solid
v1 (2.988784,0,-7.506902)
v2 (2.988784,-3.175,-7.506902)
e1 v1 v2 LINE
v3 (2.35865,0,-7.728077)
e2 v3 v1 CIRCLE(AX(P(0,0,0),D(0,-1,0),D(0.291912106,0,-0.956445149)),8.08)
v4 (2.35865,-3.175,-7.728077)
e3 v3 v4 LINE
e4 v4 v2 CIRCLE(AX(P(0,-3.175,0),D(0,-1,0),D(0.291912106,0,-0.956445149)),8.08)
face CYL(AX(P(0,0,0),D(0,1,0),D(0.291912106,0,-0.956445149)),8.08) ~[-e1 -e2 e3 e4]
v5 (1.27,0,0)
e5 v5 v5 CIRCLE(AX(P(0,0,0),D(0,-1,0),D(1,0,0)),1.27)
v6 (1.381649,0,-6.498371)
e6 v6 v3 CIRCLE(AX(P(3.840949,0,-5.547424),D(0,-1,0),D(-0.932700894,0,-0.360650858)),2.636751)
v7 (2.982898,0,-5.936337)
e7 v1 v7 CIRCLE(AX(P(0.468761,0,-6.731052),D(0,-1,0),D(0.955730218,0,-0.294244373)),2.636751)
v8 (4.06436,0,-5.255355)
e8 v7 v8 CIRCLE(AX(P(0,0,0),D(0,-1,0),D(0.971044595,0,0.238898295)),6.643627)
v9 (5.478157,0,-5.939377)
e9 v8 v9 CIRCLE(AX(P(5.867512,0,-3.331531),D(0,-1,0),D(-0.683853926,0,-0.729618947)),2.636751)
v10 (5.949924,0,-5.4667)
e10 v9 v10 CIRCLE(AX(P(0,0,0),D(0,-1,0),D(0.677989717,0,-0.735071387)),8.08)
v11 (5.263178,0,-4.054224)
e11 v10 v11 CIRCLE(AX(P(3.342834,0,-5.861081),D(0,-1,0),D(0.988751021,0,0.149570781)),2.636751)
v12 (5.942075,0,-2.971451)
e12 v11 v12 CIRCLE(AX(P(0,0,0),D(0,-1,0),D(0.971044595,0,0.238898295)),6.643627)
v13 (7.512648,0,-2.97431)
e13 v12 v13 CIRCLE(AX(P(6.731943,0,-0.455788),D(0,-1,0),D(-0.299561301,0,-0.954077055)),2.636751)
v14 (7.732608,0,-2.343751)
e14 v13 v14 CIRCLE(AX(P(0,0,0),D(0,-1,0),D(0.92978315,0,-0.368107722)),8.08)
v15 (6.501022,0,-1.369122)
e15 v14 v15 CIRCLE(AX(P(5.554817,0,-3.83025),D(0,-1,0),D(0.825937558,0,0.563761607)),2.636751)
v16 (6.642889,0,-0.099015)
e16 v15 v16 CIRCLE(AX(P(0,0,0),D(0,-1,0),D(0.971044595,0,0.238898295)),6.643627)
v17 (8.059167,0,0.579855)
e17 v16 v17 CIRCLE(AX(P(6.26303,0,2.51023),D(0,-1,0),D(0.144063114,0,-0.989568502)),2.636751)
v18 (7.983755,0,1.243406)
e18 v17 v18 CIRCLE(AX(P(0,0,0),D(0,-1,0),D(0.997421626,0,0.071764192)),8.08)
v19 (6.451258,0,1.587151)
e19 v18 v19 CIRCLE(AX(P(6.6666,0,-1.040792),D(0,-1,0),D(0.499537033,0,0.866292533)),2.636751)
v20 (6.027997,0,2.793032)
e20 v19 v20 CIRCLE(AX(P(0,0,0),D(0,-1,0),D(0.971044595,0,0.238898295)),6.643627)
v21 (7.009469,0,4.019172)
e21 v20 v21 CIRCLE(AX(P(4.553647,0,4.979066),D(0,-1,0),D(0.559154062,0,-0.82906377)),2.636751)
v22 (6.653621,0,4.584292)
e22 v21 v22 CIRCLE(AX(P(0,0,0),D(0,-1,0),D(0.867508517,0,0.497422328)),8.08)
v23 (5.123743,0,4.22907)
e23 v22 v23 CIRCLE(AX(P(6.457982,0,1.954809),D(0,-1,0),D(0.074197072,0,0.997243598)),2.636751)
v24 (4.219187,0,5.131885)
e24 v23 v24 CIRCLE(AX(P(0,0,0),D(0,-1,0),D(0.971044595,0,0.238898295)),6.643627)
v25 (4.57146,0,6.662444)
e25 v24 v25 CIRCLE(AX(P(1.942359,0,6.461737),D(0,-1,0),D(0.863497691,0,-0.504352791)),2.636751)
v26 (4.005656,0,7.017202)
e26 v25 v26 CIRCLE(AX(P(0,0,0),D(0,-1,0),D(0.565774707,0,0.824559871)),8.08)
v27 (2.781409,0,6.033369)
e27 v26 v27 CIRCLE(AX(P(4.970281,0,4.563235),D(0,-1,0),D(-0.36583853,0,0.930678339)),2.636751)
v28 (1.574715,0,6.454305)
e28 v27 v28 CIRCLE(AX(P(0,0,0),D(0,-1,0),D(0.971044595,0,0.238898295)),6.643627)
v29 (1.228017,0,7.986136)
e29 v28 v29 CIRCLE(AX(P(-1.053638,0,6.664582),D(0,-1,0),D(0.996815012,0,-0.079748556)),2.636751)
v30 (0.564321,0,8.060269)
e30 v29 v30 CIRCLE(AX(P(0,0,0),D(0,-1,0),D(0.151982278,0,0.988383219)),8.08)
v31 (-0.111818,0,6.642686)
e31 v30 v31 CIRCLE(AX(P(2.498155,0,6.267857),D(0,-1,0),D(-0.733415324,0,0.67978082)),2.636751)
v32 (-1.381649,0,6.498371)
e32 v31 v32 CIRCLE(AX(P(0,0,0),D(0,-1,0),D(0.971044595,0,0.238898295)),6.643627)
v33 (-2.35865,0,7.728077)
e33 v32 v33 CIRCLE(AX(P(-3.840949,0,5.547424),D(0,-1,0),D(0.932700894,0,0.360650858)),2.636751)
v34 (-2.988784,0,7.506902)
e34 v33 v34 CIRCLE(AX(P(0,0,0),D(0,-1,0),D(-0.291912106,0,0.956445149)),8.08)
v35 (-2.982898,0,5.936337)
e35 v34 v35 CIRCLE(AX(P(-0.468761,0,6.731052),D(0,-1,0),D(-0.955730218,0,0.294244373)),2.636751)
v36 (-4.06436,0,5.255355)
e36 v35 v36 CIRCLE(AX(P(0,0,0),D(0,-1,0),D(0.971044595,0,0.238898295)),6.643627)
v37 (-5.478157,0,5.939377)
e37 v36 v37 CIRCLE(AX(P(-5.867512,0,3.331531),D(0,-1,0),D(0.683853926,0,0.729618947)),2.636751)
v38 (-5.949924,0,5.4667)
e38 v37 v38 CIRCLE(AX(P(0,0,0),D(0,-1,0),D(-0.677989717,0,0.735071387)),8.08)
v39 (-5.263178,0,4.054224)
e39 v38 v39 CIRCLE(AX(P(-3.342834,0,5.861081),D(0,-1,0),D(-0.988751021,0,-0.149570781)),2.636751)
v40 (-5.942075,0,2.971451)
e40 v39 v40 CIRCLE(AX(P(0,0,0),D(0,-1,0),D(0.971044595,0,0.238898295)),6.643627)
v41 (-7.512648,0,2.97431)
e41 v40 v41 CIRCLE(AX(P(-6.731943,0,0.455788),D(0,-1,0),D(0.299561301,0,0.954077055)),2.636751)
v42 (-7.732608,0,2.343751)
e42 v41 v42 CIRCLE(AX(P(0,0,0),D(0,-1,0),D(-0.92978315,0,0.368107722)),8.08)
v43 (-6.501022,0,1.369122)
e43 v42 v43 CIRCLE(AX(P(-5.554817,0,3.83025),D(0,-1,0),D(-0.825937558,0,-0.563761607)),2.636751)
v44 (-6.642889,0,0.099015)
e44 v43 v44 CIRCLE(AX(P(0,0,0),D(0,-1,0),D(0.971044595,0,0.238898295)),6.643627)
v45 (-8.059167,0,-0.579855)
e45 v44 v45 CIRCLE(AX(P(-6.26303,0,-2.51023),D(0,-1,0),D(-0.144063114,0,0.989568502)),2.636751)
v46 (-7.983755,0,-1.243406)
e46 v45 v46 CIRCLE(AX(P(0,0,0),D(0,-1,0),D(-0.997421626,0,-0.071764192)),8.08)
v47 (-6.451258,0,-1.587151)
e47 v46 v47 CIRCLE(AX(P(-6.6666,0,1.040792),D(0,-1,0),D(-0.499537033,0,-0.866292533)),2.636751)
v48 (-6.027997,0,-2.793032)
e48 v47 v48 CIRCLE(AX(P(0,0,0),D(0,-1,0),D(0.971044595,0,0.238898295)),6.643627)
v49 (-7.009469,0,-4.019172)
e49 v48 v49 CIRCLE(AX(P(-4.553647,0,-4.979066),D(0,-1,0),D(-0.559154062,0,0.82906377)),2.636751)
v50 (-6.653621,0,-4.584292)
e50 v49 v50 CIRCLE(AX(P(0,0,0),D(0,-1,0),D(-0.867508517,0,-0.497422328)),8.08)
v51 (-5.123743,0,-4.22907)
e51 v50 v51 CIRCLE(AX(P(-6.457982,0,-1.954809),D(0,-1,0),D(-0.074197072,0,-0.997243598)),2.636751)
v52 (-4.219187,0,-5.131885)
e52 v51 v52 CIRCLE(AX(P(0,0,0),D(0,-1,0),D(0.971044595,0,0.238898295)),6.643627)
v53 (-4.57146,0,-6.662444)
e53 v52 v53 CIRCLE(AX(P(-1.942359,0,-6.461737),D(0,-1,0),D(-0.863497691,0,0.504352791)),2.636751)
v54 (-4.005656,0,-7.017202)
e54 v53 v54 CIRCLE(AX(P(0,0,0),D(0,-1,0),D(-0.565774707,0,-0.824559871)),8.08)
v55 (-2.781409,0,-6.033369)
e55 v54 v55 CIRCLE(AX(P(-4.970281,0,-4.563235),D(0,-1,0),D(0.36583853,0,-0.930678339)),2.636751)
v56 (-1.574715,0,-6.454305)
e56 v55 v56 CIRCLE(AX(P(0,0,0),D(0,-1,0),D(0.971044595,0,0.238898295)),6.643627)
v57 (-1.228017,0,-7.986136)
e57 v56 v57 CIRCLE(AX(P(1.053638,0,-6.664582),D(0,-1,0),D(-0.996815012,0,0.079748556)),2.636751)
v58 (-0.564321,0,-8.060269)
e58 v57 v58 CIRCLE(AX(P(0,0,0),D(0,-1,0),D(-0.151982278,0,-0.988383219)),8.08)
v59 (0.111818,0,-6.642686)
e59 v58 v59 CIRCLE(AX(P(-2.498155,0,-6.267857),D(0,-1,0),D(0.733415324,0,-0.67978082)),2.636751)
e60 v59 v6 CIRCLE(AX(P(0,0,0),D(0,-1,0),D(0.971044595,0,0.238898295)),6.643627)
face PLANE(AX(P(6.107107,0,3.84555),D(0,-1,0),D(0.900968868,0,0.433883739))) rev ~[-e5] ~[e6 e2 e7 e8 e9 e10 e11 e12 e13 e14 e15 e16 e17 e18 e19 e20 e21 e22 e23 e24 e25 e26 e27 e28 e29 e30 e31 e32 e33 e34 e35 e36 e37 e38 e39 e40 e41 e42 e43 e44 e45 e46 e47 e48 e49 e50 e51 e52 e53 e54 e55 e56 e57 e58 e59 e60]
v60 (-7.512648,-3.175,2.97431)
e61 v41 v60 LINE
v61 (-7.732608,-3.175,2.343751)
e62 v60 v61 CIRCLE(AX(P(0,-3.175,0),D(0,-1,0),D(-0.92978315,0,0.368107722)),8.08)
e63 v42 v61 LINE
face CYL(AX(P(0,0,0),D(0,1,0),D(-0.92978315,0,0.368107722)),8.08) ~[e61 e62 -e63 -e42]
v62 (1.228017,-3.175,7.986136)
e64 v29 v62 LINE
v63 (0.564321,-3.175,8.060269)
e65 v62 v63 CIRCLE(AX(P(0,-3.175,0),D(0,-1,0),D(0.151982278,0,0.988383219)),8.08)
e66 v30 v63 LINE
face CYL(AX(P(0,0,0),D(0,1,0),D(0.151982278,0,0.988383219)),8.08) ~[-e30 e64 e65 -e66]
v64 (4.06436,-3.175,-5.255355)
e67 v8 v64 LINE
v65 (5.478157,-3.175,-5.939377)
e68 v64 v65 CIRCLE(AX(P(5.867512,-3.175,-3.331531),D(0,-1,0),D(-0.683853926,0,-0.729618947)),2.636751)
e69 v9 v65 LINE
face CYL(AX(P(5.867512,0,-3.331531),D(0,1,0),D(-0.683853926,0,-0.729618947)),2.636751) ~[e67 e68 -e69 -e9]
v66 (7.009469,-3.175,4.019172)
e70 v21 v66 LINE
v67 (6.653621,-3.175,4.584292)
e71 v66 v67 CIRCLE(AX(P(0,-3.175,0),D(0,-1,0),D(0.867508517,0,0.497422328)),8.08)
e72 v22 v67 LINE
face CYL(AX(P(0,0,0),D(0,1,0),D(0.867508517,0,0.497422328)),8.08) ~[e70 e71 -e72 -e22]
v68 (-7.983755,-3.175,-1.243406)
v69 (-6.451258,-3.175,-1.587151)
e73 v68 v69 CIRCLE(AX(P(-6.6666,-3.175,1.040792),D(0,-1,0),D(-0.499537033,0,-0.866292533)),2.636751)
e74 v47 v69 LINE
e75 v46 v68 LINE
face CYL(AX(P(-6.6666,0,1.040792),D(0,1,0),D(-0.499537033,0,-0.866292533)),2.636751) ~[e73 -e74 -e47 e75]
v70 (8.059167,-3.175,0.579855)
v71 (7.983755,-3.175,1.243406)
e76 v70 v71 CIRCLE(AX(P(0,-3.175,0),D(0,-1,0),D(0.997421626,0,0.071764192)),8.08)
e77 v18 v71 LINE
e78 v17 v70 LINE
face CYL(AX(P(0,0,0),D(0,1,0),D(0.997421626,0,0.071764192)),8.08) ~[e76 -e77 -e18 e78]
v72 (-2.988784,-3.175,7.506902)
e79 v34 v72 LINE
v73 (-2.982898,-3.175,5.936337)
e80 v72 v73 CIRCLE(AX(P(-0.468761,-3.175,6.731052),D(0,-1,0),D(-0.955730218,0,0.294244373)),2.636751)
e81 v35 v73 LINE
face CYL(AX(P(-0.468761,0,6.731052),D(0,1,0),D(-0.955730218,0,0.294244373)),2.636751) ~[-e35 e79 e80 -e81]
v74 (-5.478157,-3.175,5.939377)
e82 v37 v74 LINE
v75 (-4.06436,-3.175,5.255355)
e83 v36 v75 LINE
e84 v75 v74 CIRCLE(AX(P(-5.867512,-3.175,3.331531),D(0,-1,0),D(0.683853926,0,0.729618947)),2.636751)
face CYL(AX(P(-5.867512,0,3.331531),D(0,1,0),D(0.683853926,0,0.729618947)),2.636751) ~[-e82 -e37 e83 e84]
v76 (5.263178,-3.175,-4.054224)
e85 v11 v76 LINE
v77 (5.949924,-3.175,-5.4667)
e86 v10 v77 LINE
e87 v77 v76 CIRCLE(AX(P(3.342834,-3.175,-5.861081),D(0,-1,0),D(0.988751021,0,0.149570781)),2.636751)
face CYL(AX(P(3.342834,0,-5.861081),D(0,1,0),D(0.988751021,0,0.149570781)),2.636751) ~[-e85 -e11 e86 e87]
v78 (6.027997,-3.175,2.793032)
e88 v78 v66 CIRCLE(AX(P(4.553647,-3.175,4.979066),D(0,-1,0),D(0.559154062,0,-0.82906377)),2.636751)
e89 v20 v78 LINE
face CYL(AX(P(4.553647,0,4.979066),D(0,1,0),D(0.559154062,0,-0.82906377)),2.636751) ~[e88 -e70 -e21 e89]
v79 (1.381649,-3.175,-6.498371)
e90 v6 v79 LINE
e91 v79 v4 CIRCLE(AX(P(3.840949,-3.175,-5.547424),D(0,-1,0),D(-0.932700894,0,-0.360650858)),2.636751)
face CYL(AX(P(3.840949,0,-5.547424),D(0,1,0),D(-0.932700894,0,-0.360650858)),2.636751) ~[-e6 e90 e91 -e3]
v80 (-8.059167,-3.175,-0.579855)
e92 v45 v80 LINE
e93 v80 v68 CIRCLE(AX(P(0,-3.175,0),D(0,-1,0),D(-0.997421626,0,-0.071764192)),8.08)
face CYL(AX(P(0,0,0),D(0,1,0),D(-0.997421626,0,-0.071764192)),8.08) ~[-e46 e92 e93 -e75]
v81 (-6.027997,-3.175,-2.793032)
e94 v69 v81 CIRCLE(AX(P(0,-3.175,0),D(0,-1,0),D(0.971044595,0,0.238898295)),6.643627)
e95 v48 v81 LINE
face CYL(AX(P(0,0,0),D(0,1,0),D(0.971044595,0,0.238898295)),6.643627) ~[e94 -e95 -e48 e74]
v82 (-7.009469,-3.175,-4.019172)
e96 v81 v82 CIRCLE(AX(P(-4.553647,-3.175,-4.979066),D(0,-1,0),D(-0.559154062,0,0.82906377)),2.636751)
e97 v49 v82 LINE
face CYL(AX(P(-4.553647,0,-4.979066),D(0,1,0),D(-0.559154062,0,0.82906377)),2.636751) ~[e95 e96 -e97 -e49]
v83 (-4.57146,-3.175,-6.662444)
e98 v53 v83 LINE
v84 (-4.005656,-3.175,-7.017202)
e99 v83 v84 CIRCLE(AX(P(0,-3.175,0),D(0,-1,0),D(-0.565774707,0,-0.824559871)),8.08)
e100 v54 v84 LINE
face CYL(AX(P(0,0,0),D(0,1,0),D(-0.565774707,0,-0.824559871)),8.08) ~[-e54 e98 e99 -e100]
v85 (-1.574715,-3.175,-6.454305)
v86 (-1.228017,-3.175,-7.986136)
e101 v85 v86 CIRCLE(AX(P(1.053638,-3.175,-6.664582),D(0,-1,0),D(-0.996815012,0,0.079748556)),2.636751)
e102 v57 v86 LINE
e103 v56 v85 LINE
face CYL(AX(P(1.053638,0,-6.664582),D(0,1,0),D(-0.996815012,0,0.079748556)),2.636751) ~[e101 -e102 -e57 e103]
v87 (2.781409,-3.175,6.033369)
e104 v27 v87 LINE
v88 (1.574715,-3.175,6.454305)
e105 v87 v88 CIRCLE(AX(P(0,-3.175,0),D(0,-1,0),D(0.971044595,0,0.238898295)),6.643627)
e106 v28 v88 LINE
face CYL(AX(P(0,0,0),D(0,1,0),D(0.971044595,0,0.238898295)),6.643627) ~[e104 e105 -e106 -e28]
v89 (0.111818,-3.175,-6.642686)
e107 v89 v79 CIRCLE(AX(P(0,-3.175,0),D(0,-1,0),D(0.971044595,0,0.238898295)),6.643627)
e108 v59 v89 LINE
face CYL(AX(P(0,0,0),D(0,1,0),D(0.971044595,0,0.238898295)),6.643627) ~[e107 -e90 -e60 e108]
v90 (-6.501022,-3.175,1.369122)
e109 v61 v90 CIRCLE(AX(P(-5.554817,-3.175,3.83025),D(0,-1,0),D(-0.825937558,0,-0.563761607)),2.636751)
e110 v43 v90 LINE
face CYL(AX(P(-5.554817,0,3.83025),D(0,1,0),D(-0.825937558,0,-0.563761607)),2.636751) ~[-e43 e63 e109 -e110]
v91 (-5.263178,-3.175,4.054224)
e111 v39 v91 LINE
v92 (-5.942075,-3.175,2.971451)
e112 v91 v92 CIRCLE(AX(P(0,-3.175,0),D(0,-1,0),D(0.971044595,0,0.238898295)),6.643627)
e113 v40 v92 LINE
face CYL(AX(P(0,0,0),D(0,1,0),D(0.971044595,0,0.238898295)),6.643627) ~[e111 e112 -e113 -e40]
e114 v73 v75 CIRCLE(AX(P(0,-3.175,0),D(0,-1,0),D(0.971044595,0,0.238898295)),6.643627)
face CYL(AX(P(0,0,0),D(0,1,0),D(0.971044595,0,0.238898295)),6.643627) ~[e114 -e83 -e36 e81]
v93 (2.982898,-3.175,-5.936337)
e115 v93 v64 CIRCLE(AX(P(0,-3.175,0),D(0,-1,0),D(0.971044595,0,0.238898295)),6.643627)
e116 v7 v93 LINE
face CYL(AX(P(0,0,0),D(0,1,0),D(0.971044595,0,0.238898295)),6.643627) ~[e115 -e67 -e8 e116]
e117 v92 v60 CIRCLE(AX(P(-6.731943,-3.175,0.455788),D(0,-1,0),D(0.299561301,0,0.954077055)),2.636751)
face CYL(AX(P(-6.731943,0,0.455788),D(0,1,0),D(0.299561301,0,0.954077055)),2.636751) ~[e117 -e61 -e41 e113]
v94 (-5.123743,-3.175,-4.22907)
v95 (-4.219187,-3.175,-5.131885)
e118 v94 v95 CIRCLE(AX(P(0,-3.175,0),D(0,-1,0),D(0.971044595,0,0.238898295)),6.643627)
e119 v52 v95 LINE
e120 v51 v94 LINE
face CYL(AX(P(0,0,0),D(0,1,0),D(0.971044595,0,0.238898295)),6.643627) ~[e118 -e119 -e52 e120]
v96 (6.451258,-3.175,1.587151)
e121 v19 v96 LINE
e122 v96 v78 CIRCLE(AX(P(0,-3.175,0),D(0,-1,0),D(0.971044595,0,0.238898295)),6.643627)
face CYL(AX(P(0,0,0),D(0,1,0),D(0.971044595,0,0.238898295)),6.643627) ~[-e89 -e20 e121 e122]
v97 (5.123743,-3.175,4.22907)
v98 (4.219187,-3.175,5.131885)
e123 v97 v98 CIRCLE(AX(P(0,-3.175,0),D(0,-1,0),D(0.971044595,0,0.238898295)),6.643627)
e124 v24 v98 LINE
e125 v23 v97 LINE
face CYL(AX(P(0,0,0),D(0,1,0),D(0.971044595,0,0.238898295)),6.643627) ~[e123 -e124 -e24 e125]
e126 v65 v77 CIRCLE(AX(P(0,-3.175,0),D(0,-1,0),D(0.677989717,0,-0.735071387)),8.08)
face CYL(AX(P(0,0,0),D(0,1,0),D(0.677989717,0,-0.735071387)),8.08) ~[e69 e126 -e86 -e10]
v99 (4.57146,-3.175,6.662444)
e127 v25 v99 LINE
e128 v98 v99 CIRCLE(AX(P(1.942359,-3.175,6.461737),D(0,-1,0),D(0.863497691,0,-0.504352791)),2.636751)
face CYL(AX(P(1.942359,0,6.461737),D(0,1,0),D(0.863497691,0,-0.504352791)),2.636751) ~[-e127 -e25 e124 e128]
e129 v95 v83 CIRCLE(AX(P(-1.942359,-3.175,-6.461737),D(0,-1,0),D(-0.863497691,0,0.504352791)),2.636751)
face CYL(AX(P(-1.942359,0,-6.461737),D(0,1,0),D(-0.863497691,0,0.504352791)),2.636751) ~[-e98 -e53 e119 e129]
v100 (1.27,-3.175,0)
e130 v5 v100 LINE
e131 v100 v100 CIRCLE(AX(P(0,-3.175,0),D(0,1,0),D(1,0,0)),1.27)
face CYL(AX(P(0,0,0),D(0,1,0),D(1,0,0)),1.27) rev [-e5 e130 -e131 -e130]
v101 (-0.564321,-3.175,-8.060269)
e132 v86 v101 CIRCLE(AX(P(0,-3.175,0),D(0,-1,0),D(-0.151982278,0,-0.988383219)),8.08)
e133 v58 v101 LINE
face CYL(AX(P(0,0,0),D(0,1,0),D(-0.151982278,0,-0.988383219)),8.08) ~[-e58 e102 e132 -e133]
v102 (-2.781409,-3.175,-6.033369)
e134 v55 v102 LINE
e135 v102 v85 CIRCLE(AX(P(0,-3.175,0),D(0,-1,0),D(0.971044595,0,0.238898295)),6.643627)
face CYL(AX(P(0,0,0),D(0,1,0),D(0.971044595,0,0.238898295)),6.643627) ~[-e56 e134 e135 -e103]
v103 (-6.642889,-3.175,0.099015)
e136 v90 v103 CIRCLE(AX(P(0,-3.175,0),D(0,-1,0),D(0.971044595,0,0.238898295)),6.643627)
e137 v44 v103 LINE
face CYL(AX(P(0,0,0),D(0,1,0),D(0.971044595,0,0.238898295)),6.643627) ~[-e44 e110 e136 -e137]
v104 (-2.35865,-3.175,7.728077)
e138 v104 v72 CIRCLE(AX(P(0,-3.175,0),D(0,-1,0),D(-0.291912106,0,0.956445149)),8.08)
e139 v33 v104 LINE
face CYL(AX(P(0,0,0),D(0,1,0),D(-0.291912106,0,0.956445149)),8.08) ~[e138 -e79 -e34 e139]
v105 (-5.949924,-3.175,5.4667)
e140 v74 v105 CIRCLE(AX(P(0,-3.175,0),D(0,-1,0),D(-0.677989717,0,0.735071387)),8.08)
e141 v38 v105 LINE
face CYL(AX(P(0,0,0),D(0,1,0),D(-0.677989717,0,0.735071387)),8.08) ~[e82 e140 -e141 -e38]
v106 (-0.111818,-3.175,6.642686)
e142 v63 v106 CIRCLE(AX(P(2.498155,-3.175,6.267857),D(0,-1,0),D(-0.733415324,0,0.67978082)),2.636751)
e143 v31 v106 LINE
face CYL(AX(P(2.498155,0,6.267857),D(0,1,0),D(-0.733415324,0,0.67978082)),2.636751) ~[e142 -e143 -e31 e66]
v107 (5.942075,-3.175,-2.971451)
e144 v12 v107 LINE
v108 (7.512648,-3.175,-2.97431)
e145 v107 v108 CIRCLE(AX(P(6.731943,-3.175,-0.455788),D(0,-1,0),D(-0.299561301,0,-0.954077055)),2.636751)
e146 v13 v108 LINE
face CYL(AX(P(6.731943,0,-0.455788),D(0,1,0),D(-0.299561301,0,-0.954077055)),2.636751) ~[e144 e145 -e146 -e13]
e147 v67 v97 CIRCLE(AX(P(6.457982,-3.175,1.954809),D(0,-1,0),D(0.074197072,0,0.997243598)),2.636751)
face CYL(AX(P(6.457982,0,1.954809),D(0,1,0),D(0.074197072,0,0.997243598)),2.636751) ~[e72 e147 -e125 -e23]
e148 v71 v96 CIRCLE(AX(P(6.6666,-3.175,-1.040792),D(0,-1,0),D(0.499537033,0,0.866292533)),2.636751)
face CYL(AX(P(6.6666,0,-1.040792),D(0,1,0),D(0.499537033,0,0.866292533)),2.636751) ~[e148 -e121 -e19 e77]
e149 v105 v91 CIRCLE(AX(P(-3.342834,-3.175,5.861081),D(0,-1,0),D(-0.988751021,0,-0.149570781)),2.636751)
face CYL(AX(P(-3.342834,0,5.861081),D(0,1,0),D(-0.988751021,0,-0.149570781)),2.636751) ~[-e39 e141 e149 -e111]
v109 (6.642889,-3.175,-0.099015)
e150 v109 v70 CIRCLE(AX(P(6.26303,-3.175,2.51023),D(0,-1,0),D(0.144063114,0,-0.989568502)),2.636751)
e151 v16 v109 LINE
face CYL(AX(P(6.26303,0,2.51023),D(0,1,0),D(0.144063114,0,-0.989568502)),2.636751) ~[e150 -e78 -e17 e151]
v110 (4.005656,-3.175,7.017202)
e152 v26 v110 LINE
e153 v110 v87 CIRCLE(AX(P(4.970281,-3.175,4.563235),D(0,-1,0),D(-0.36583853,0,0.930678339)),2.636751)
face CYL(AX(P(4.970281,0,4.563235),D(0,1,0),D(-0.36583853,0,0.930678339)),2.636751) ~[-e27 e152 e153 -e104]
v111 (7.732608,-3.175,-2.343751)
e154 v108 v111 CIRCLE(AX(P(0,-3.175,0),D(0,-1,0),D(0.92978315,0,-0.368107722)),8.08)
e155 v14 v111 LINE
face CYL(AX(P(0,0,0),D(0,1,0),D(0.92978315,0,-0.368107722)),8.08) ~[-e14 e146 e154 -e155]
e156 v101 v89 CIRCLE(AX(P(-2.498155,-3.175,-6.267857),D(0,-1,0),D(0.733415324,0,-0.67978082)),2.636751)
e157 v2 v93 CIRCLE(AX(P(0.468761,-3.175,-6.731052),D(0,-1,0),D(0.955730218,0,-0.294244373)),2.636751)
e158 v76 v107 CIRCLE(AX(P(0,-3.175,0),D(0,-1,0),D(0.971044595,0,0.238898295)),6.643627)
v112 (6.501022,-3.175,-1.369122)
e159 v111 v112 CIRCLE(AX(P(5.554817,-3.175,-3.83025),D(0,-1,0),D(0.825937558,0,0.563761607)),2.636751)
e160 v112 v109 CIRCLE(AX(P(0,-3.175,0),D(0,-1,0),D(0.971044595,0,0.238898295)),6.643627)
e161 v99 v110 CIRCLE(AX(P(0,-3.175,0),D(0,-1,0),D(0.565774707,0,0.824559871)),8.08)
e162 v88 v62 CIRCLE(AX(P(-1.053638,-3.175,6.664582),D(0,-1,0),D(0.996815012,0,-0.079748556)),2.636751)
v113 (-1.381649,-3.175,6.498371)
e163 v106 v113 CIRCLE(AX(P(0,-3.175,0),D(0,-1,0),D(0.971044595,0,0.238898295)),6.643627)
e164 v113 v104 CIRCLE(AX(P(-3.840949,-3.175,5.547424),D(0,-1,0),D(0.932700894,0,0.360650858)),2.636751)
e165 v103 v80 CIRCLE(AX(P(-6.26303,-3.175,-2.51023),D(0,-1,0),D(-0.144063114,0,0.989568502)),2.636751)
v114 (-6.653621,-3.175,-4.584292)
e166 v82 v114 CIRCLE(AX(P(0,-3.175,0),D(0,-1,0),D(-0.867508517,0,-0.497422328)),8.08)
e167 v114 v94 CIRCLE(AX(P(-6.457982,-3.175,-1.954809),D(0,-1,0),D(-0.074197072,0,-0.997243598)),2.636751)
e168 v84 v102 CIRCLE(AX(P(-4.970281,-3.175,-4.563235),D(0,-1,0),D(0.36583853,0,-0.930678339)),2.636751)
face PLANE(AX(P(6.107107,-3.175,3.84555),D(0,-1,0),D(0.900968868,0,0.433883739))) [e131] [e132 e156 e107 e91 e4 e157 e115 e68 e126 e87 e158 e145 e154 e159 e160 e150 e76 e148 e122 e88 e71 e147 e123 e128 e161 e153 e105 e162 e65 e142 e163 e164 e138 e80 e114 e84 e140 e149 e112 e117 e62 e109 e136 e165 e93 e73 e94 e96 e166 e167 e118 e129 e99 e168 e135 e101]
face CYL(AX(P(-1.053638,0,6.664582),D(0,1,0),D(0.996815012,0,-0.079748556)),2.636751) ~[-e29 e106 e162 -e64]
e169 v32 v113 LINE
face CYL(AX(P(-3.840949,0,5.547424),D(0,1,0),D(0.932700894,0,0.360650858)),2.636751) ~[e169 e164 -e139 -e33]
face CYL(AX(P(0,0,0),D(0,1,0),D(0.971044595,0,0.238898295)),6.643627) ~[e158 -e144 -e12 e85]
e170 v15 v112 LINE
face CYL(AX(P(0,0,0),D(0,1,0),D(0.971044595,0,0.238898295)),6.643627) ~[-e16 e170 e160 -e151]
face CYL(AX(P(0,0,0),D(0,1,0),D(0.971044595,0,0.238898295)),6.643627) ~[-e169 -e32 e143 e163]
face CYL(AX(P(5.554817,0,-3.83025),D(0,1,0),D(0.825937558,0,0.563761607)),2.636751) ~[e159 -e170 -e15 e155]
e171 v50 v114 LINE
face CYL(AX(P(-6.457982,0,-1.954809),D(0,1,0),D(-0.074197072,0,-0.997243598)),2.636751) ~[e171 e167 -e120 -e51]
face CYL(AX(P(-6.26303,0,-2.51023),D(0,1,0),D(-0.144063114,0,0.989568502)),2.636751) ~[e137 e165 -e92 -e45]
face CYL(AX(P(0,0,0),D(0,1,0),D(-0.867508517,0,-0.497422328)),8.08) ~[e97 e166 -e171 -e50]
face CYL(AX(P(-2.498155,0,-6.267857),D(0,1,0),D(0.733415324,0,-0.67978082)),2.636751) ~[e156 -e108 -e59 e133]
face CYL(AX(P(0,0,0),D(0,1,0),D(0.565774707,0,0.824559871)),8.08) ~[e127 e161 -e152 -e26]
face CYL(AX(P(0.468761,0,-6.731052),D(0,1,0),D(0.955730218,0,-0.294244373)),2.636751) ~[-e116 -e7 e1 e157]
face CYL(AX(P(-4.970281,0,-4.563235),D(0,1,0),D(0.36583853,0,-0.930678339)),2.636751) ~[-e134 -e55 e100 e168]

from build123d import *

# Parameters (mm, degrees)
F1_R     = 1.27
F2_DEPTH = 3.175
F3_DEPTH = 3.175
F5_COUNT = 14
F5_ANGLE = 334.2857142857


# Not quite as in the source:
# - a length typed as a fraction of an inch, garbled in the dataset ("3 / 203.2 mm" for 3/8 in), is restored


with BuildPart() as f2:
    # F1 (on Front) → F2 (new body)
    with BuildSketch(Plane.XZ):
        with BuildLine():
            ThreePointArc((6.6428889328, -0.0990154985), (6.6434423524, -0.049509124), (6.643626829, 0))
            ThreePointArc((6.643626829, 0), (6.5953592641, 0.7993832744), (6.4512579209, 1.587151121))
            ThreePointArc((6.4512579209, 1.587151121), (-6.6011332303, -0.7502116494), (6.6428889328, -0.0990154985))
        make_face()
        Circle(F1_R, mode=Mode.SUBTRACT)
    extrude(amount=F2_DEPTH)

    # F1 (on Front) → F3 (join)
    with BuildSketch(Plane.XZ):
        with BuildLine():
            ThreePointArc((6.4512579209, 1.587151121), (6.5953592641, 0.7993832744), (6.643626829, 0))
            ThreePointArc((6.643626829, 0), (6.6434423524, -0.049509124), (6.6428889328, -0.0990154985))
            ThreePointArc((6.6428889328, -0.0990154985), (7.4027472944, 0.1325210174), (8.0591667411, 0.5798546712))
            ThreePointArc((8.0591667411, 0.5798546712), (8.0283191506, 0.9124097851), (7.9837548494, 1.2434060096))
            ThreePointArc((7.9837548494, 1.2434060096), (7.2436944715, 1.5320312423), (6.4512579209, 1.587151121))
        make_face()
    extrude(amount=F3_DEPTH)

    # F5: F2 ×14 about axis
    f5_axis = Axis((0, 6.1465417966, 0), (0, 1, 0))


with BuildPart() as f2_1:
    add(f2.part)
    for i in range(1, F5_COUNT):
        add(f2.part.rotate(f5_axis, i * F5_ANGLE / (F5_COUNT - 1)))


solid = f2_1.part
